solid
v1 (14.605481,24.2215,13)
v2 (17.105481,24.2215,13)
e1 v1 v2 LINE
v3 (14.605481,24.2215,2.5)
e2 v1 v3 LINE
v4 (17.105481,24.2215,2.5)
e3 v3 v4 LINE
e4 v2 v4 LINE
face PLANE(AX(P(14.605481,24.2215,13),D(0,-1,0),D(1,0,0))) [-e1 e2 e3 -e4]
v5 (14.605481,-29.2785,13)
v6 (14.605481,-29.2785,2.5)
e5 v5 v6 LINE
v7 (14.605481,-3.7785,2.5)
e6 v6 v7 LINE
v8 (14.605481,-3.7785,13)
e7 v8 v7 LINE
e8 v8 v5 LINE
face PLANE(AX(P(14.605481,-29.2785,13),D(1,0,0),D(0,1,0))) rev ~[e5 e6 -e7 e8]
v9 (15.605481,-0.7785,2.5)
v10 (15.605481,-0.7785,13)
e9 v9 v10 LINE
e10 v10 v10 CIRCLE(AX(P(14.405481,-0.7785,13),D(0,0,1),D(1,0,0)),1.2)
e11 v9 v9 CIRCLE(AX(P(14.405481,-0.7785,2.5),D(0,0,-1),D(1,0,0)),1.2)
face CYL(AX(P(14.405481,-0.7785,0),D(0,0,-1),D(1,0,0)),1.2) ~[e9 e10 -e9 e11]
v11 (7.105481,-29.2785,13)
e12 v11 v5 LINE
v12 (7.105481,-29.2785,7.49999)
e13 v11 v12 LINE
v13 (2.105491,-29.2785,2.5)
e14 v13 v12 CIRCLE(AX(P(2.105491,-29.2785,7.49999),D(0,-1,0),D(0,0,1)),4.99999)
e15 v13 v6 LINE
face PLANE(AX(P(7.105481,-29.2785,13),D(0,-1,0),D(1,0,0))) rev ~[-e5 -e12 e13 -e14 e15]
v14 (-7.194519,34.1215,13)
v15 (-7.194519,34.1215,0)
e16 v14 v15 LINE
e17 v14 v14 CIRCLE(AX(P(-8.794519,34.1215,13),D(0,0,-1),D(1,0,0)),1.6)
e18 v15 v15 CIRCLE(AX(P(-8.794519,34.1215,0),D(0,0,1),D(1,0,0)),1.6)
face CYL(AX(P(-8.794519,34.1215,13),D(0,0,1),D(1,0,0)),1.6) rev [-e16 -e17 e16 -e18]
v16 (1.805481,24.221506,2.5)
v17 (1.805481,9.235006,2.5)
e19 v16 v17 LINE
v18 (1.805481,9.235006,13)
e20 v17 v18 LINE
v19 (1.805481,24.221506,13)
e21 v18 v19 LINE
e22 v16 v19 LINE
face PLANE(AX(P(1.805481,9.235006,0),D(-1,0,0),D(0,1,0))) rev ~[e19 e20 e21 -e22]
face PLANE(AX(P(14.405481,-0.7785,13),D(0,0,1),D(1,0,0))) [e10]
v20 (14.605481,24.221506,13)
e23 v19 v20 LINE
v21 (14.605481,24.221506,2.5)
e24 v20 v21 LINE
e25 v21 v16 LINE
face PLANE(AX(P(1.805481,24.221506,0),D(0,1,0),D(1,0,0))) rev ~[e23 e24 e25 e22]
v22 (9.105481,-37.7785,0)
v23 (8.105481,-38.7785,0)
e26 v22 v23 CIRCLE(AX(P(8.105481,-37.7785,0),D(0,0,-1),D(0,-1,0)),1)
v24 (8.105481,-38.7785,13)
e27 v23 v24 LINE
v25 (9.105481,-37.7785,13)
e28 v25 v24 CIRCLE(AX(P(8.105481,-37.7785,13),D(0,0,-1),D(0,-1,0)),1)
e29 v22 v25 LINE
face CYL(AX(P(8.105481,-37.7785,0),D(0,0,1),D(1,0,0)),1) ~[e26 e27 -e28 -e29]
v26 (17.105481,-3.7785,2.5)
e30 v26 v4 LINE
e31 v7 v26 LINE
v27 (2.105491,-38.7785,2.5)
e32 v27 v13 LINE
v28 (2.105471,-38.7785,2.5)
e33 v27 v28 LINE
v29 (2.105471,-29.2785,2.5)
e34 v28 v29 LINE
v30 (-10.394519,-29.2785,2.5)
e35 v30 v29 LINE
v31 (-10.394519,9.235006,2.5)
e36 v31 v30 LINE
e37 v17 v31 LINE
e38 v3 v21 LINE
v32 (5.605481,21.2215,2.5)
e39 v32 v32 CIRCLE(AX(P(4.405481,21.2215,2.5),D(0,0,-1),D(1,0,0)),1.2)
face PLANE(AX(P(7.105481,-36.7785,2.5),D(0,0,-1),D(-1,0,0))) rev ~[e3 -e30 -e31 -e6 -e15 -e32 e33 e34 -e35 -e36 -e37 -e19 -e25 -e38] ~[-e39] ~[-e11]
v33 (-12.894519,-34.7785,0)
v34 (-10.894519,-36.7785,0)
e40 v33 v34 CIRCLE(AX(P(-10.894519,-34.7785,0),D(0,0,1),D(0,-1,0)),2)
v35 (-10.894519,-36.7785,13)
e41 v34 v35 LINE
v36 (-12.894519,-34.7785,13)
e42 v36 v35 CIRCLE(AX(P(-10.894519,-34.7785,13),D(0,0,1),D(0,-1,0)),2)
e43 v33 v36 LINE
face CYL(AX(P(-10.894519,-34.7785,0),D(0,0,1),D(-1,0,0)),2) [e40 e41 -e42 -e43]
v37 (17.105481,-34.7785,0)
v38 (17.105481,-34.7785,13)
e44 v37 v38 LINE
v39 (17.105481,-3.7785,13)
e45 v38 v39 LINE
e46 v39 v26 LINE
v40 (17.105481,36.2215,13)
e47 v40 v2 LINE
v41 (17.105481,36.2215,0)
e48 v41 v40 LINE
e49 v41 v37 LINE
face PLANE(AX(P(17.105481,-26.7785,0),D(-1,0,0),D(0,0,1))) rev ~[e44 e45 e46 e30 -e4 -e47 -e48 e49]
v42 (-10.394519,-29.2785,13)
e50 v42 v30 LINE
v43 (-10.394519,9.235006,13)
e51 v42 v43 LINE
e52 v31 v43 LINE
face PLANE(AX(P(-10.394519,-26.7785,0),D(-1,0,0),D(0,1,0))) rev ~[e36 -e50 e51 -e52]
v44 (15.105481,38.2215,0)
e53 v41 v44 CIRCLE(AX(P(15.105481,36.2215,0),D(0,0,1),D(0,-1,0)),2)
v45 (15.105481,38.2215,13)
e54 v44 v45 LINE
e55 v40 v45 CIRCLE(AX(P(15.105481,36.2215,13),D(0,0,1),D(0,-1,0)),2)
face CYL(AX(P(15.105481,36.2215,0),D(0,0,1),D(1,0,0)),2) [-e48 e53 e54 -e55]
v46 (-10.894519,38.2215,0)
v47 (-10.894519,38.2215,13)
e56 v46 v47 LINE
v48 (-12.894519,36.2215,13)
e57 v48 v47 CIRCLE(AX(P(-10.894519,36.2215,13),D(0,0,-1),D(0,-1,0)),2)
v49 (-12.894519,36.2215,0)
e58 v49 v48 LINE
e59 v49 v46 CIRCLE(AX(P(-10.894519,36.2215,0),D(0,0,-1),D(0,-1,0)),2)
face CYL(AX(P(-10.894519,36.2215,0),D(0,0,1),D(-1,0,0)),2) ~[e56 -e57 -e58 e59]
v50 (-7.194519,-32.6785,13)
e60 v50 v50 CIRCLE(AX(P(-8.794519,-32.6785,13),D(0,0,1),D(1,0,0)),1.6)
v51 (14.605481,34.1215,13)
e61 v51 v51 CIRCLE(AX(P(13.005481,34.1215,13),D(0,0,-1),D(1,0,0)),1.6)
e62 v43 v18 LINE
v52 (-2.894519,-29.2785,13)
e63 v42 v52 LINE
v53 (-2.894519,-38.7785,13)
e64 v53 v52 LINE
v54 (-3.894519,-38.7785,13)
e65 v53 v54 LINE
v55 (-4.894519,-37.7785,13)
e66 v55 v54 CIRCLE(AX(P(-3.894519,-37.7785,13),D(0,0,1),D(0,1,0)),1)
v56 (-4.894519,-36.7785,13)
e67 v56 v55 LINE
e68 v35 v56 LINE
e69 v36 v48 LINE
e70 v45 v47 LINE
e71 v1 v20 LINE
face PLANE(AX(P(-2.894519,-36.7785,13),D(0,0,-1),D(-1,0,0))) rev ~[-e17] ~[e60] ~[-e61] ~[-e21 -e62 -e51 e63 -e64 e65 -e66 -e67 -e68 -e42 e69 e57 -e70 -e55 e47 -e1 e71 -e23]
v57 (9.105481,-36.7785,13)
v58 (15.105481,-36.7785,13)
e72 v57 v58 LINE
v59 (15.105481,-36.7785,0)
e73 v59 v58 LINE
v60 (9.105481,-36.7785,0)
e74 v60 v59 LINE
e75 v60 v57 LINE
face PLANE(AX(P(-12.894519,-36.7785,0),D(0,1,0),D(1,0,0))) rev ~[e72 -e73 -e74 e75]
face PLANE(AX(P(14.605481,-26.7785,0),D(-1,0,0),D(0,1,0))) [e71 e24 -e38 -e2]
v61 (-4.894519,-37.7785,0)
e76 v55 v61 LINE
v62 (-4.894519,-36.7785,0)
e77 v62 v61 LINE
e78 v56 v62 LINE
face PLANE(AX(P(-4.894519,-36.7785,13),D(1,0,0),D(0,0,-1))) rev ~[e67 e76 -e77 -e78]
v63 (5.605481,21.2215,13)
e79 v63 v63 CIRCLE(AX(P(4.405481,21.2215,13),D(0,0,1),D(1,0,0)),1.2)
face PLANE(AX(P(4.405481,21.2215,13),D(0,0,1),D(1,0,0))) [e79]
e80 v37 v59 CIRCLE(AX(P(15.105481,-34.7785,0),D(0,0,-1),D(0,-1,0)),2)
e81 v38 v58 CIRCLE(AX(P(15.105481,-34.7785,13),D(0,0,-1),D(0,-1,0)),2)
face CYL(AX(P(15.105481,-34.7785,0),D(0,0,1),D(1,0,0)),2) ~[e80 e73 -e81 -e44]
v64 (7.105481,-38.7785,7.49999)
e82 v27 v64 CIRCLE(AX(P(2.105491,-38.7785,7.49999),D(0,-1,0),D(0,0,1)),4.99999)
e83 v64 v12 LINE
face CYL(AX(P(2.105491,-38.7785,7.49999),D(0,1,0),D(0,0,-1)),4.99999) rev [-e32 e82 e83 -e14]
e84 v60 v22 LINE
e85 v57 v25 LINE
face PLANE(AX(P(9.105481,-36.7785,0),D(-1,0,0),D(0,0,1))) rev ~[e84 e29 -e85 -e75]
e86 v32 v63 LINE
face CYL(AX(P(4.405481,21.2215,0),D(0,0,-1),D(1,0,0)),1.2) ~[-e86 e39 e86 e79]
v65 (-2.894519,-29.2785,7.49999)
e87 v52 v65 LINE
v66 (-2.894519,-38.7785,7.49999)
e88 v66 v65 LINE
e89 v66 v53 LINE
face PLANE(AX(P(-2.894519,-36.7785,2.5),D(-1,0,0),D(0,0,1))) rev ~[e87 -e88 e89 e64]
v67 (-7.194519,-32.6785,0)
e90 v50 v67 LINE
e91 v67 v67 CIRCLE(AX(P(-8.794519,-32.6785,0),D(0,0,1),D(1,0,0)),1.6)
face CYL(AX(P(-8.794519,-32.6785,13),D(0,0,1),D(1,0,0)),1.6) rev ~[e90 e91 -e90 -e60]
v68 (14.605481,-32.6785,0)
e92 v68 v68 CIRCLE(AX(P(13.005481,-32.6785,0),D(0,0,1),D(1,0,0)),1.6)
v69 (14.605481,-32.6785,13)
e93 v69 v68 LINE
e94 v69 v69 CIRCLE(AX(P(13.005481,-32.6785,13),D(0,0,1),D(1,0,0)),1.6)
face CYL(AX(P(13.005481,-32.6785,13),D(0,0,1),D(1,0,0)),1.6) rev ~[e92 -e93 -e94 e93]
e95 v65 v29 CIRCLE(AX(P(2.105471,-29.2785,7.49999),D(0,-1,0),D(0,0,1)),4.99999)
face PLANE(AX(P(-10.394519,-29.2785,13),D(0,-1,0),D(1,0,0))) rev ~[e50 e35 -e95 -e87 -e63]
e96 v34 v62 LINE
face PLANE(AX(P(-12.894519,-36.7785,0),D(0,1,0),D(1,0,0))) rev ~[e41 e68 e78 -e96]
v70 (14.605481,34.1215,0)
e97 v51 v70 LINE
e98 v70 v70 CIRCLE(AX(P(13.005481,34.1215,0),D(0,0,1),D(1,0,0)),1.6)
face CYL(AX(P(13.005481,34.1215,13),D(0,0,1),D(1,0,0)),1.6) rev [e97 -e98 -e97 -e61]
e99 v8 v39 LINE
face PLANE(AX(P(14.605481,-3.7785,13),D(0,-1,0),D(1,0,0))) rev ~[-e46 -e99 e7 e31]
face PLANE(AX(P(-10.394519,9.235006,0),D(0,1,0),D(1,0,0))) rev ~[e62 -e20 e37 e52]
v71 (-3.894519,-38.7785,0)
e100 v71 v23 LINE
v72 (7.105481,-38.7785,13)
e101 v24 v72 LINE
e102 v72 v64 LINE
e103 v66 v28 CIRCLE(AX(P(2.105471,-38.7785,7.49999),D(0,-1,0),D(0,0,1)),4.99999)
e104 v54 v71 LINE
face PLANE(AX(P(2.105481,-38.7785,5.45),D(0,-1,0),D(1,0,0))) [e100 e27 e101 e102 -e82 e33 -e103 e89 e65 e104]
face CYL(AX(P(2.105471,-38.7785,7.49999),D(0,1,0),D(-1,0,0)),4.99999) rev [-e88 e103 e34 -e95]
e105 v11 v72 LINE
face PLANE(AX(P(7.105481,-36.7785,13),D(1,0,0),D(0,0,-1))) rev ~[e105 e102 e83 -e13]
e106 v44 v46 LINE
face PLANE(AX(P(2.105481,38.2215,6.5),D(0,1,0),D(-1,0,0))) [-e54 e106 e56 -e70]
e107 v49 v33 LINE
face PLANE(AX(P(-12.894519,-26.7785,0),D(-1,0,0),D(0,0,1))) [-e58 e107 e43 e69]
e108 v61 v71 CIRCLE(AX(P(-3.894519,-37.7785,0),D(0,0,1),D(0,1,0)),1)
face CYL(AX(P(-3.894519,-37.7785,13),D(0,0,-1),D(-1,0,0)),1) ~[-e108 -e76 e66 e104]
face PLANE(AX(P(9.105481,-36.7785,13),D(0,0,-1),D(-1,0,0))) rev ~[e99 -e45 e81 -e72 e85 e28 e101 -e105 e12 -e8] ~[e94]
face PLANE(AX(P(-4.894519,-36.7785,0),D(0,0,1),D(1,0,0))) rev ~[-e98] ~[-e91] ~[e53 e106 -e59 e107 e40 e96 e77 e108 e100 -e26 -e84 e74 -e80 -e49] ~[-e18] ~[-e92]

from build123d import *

# Parameters (mm, degrees)
F0_W      = 30
F0_H      = 55
F1_DEPTH  = 13
F2_T      = -2.5
F3_W      = 2.5
F3_H      = 28
F4_DEPTH  = 10.5
F6_W      = 30
F6_H      = 13
F7_DEPTH  = 10
F9_R      = 2
F10_DEPTH = 10
F11_W     = 10
F11_H     = 7.5
F12_DEPTH = 10.5
F11_R     = 1.6
F13_DEPTH = 13.5
F5_W      = 12.8000527501
F5_H      = 1.513499856
F5_R      = 1.2
F14_DEPTH = 13
F16_R     = 2
F18_DEPTH = 2
F19_R     = 1
F20_R     = 4.99999


# Not quite as in the source:
# - a fillet or chamfer is up to 0.001 mm smaller than in the source, because OpenCascade refuses the exact size
# - a feature of the source that left no trace in its solid (it failed there, or was rolled back) is left out
# - a pattern or mirror of a feature is missing from the dataset's text; its kind, count and spacing are read off the source's solid
# - a feature names something its author has since deleted; it is built from what else it names


with BuildPart() as f1:
    # F0 (on Top) → F1 (new body)
    with BuildSketch(Plane.XY):
        with Locations((2.1054805815, 0.7215001613)):
            Rectangle(F0_W, F0_H)
    extrude(amount=F1_DEPTH)

    # F2
    f2_openings = [f1.faces().sort_by_distance(p)[0] for p in [
        (2.105481, 0.7215, 13),
    ]]
    offset(amount=F2_T, openings=f2_openings)

    # F3 (on face) → F4 (cut)
    with BuildSketch(Plane.XY.offset(13)):
        with Locations((15.8554805815, 10.2215001613)):
            Rectangle(F3_W, F3_H)
    extrude(amount=-F4_DEPTH, mode=Mode.SUBTRACT)

    # F6 (on face) → F7 (join)
    with BuildSketch(Plane(origin=(0, 28.2215001613, 0), x_dir=(-1, 0, 0), z_dir=(0, 1, 0))):
        with Locations((-2.1054805815, 6.5)):
            Rectangle(F6_W, F6_H)
    extrude(amount=F7_DEPTH)

    # F9
    f9_edges = [f1.edges().sort_by_distance(p)[0] for p in [
        (17.105481, 38.2215, 6.5),
        (-12.894519, 38.2215, 6.5),
    ]]
    fillet(f9_edges, radius=F9_R)

    # F10 (add): a face of the model
    f10_faces = [f1.faces().sort_by_distance(p)[0] for p in [
        (2.1054805815, -26.7784998387, 6.5),
    ]]
    extrude(f10_faces, amount=F10_DEPTH)

    # F11 (on face) → F12 (cut)
    with BuildSketch(Plane.XY.offset(13)):
        Polygon((14.6054805815, -24.2784998387), (-10.3945194185, -24.2784998387), (-10.3945194185, -29.2784998387), (-2.8945194185, -29.2784998387), (7.1054805815, -29.2784998387), (14.6054805815, -29.2784998387), align=None)
        with Locations((2.1054805815, -33.0284998387)):
            Rectangle(F11_W, F11_H)
    extrude(amount=-F12_DEPTH, mode=Mode.SUBTRACT)

    # F11 (on face) → F13 (cut)
    with BuildSketch(Plane.XY.offset(13)):
        with Locations((13.0054805815, -32.6784998387)):
            Circle(F11_R)
        with Locations((-8.7945194185, -32.6784998387)):
            Circle(F11_R)
    f13 = extrude(amount=-F13_DEPTH, mode=Mode.SUBTRACT)

    # F13_copies: F13 across plane
    add(f13.mirror(Plane.ZX.offset(0.7215)), mode=Mode.SUBTRACT)

    # F5 (on face) → F14 (join)
    with BuildSketch(Plane.XY):
        Polygon((1.8054805815, 25.7350058258), (-10.3945194185, 25.7350058258), (-10.3945194185, 9.2350058258), (1.8054805815, 9.2350058258), (1.8054805815, 24.2215059698), align=None)
        with Locations((8.2055069566, 24.9782558978)):
            Rectangle(F5_W, F5_H)
        with Locations((4.4054805815, 21.2215001613)):
            Circle(F5_R)
        with Locations((14.4054805815, -0.7784998387)):
            Circle(F5_R)
    extrude(amount=F14_DEPTH)

    # F16
    f16_edges = [f1.edges().sort_by_distance(p)[0] for p in [
        (17.105481, -36.7785, 6.5),
        (-12.894519, -36.7785, 6.5),
    ]]
    fillet(f16_edges, radius=F16_R)

    # F17 (on face) → F18 (join)
    with BuildSketch(Plane.XZ.offset(36.7784998387)):
        Polygon((-2.8945194185, 13), (-4.8945194185, 13), (-4.8945194185, 0), (9.1054805815, 0), (9.1054805815, 13), (7.1054805815, 13), (7.1054805815, 2.5), (-2.8945194185, 2.5), align=None)
    extrude(amount=F18_DEPTH)

    # F19
    f19_edges = [f1.edges().sort_by_distance(p)[0] for p in [
        (-4.894519, -38.7785, 6.5),
        (9.105481, -38.7785, 6.5),
    ]]
    fillet(f19_edges, radius=F19_R)

    # F20 (radius 5 in the source; OpenCascade refuses exactly that, so slightly less here)
    f20_edges = [f1.edges().sort_by_distance(p)[0] for p in [
        (-2.894519, -34.0285, 2.5),
        (7.105481, -34.0285, 2.5),
    ]]
    fillet(f20_edges, radius=F20_R)


solid = f1.part
